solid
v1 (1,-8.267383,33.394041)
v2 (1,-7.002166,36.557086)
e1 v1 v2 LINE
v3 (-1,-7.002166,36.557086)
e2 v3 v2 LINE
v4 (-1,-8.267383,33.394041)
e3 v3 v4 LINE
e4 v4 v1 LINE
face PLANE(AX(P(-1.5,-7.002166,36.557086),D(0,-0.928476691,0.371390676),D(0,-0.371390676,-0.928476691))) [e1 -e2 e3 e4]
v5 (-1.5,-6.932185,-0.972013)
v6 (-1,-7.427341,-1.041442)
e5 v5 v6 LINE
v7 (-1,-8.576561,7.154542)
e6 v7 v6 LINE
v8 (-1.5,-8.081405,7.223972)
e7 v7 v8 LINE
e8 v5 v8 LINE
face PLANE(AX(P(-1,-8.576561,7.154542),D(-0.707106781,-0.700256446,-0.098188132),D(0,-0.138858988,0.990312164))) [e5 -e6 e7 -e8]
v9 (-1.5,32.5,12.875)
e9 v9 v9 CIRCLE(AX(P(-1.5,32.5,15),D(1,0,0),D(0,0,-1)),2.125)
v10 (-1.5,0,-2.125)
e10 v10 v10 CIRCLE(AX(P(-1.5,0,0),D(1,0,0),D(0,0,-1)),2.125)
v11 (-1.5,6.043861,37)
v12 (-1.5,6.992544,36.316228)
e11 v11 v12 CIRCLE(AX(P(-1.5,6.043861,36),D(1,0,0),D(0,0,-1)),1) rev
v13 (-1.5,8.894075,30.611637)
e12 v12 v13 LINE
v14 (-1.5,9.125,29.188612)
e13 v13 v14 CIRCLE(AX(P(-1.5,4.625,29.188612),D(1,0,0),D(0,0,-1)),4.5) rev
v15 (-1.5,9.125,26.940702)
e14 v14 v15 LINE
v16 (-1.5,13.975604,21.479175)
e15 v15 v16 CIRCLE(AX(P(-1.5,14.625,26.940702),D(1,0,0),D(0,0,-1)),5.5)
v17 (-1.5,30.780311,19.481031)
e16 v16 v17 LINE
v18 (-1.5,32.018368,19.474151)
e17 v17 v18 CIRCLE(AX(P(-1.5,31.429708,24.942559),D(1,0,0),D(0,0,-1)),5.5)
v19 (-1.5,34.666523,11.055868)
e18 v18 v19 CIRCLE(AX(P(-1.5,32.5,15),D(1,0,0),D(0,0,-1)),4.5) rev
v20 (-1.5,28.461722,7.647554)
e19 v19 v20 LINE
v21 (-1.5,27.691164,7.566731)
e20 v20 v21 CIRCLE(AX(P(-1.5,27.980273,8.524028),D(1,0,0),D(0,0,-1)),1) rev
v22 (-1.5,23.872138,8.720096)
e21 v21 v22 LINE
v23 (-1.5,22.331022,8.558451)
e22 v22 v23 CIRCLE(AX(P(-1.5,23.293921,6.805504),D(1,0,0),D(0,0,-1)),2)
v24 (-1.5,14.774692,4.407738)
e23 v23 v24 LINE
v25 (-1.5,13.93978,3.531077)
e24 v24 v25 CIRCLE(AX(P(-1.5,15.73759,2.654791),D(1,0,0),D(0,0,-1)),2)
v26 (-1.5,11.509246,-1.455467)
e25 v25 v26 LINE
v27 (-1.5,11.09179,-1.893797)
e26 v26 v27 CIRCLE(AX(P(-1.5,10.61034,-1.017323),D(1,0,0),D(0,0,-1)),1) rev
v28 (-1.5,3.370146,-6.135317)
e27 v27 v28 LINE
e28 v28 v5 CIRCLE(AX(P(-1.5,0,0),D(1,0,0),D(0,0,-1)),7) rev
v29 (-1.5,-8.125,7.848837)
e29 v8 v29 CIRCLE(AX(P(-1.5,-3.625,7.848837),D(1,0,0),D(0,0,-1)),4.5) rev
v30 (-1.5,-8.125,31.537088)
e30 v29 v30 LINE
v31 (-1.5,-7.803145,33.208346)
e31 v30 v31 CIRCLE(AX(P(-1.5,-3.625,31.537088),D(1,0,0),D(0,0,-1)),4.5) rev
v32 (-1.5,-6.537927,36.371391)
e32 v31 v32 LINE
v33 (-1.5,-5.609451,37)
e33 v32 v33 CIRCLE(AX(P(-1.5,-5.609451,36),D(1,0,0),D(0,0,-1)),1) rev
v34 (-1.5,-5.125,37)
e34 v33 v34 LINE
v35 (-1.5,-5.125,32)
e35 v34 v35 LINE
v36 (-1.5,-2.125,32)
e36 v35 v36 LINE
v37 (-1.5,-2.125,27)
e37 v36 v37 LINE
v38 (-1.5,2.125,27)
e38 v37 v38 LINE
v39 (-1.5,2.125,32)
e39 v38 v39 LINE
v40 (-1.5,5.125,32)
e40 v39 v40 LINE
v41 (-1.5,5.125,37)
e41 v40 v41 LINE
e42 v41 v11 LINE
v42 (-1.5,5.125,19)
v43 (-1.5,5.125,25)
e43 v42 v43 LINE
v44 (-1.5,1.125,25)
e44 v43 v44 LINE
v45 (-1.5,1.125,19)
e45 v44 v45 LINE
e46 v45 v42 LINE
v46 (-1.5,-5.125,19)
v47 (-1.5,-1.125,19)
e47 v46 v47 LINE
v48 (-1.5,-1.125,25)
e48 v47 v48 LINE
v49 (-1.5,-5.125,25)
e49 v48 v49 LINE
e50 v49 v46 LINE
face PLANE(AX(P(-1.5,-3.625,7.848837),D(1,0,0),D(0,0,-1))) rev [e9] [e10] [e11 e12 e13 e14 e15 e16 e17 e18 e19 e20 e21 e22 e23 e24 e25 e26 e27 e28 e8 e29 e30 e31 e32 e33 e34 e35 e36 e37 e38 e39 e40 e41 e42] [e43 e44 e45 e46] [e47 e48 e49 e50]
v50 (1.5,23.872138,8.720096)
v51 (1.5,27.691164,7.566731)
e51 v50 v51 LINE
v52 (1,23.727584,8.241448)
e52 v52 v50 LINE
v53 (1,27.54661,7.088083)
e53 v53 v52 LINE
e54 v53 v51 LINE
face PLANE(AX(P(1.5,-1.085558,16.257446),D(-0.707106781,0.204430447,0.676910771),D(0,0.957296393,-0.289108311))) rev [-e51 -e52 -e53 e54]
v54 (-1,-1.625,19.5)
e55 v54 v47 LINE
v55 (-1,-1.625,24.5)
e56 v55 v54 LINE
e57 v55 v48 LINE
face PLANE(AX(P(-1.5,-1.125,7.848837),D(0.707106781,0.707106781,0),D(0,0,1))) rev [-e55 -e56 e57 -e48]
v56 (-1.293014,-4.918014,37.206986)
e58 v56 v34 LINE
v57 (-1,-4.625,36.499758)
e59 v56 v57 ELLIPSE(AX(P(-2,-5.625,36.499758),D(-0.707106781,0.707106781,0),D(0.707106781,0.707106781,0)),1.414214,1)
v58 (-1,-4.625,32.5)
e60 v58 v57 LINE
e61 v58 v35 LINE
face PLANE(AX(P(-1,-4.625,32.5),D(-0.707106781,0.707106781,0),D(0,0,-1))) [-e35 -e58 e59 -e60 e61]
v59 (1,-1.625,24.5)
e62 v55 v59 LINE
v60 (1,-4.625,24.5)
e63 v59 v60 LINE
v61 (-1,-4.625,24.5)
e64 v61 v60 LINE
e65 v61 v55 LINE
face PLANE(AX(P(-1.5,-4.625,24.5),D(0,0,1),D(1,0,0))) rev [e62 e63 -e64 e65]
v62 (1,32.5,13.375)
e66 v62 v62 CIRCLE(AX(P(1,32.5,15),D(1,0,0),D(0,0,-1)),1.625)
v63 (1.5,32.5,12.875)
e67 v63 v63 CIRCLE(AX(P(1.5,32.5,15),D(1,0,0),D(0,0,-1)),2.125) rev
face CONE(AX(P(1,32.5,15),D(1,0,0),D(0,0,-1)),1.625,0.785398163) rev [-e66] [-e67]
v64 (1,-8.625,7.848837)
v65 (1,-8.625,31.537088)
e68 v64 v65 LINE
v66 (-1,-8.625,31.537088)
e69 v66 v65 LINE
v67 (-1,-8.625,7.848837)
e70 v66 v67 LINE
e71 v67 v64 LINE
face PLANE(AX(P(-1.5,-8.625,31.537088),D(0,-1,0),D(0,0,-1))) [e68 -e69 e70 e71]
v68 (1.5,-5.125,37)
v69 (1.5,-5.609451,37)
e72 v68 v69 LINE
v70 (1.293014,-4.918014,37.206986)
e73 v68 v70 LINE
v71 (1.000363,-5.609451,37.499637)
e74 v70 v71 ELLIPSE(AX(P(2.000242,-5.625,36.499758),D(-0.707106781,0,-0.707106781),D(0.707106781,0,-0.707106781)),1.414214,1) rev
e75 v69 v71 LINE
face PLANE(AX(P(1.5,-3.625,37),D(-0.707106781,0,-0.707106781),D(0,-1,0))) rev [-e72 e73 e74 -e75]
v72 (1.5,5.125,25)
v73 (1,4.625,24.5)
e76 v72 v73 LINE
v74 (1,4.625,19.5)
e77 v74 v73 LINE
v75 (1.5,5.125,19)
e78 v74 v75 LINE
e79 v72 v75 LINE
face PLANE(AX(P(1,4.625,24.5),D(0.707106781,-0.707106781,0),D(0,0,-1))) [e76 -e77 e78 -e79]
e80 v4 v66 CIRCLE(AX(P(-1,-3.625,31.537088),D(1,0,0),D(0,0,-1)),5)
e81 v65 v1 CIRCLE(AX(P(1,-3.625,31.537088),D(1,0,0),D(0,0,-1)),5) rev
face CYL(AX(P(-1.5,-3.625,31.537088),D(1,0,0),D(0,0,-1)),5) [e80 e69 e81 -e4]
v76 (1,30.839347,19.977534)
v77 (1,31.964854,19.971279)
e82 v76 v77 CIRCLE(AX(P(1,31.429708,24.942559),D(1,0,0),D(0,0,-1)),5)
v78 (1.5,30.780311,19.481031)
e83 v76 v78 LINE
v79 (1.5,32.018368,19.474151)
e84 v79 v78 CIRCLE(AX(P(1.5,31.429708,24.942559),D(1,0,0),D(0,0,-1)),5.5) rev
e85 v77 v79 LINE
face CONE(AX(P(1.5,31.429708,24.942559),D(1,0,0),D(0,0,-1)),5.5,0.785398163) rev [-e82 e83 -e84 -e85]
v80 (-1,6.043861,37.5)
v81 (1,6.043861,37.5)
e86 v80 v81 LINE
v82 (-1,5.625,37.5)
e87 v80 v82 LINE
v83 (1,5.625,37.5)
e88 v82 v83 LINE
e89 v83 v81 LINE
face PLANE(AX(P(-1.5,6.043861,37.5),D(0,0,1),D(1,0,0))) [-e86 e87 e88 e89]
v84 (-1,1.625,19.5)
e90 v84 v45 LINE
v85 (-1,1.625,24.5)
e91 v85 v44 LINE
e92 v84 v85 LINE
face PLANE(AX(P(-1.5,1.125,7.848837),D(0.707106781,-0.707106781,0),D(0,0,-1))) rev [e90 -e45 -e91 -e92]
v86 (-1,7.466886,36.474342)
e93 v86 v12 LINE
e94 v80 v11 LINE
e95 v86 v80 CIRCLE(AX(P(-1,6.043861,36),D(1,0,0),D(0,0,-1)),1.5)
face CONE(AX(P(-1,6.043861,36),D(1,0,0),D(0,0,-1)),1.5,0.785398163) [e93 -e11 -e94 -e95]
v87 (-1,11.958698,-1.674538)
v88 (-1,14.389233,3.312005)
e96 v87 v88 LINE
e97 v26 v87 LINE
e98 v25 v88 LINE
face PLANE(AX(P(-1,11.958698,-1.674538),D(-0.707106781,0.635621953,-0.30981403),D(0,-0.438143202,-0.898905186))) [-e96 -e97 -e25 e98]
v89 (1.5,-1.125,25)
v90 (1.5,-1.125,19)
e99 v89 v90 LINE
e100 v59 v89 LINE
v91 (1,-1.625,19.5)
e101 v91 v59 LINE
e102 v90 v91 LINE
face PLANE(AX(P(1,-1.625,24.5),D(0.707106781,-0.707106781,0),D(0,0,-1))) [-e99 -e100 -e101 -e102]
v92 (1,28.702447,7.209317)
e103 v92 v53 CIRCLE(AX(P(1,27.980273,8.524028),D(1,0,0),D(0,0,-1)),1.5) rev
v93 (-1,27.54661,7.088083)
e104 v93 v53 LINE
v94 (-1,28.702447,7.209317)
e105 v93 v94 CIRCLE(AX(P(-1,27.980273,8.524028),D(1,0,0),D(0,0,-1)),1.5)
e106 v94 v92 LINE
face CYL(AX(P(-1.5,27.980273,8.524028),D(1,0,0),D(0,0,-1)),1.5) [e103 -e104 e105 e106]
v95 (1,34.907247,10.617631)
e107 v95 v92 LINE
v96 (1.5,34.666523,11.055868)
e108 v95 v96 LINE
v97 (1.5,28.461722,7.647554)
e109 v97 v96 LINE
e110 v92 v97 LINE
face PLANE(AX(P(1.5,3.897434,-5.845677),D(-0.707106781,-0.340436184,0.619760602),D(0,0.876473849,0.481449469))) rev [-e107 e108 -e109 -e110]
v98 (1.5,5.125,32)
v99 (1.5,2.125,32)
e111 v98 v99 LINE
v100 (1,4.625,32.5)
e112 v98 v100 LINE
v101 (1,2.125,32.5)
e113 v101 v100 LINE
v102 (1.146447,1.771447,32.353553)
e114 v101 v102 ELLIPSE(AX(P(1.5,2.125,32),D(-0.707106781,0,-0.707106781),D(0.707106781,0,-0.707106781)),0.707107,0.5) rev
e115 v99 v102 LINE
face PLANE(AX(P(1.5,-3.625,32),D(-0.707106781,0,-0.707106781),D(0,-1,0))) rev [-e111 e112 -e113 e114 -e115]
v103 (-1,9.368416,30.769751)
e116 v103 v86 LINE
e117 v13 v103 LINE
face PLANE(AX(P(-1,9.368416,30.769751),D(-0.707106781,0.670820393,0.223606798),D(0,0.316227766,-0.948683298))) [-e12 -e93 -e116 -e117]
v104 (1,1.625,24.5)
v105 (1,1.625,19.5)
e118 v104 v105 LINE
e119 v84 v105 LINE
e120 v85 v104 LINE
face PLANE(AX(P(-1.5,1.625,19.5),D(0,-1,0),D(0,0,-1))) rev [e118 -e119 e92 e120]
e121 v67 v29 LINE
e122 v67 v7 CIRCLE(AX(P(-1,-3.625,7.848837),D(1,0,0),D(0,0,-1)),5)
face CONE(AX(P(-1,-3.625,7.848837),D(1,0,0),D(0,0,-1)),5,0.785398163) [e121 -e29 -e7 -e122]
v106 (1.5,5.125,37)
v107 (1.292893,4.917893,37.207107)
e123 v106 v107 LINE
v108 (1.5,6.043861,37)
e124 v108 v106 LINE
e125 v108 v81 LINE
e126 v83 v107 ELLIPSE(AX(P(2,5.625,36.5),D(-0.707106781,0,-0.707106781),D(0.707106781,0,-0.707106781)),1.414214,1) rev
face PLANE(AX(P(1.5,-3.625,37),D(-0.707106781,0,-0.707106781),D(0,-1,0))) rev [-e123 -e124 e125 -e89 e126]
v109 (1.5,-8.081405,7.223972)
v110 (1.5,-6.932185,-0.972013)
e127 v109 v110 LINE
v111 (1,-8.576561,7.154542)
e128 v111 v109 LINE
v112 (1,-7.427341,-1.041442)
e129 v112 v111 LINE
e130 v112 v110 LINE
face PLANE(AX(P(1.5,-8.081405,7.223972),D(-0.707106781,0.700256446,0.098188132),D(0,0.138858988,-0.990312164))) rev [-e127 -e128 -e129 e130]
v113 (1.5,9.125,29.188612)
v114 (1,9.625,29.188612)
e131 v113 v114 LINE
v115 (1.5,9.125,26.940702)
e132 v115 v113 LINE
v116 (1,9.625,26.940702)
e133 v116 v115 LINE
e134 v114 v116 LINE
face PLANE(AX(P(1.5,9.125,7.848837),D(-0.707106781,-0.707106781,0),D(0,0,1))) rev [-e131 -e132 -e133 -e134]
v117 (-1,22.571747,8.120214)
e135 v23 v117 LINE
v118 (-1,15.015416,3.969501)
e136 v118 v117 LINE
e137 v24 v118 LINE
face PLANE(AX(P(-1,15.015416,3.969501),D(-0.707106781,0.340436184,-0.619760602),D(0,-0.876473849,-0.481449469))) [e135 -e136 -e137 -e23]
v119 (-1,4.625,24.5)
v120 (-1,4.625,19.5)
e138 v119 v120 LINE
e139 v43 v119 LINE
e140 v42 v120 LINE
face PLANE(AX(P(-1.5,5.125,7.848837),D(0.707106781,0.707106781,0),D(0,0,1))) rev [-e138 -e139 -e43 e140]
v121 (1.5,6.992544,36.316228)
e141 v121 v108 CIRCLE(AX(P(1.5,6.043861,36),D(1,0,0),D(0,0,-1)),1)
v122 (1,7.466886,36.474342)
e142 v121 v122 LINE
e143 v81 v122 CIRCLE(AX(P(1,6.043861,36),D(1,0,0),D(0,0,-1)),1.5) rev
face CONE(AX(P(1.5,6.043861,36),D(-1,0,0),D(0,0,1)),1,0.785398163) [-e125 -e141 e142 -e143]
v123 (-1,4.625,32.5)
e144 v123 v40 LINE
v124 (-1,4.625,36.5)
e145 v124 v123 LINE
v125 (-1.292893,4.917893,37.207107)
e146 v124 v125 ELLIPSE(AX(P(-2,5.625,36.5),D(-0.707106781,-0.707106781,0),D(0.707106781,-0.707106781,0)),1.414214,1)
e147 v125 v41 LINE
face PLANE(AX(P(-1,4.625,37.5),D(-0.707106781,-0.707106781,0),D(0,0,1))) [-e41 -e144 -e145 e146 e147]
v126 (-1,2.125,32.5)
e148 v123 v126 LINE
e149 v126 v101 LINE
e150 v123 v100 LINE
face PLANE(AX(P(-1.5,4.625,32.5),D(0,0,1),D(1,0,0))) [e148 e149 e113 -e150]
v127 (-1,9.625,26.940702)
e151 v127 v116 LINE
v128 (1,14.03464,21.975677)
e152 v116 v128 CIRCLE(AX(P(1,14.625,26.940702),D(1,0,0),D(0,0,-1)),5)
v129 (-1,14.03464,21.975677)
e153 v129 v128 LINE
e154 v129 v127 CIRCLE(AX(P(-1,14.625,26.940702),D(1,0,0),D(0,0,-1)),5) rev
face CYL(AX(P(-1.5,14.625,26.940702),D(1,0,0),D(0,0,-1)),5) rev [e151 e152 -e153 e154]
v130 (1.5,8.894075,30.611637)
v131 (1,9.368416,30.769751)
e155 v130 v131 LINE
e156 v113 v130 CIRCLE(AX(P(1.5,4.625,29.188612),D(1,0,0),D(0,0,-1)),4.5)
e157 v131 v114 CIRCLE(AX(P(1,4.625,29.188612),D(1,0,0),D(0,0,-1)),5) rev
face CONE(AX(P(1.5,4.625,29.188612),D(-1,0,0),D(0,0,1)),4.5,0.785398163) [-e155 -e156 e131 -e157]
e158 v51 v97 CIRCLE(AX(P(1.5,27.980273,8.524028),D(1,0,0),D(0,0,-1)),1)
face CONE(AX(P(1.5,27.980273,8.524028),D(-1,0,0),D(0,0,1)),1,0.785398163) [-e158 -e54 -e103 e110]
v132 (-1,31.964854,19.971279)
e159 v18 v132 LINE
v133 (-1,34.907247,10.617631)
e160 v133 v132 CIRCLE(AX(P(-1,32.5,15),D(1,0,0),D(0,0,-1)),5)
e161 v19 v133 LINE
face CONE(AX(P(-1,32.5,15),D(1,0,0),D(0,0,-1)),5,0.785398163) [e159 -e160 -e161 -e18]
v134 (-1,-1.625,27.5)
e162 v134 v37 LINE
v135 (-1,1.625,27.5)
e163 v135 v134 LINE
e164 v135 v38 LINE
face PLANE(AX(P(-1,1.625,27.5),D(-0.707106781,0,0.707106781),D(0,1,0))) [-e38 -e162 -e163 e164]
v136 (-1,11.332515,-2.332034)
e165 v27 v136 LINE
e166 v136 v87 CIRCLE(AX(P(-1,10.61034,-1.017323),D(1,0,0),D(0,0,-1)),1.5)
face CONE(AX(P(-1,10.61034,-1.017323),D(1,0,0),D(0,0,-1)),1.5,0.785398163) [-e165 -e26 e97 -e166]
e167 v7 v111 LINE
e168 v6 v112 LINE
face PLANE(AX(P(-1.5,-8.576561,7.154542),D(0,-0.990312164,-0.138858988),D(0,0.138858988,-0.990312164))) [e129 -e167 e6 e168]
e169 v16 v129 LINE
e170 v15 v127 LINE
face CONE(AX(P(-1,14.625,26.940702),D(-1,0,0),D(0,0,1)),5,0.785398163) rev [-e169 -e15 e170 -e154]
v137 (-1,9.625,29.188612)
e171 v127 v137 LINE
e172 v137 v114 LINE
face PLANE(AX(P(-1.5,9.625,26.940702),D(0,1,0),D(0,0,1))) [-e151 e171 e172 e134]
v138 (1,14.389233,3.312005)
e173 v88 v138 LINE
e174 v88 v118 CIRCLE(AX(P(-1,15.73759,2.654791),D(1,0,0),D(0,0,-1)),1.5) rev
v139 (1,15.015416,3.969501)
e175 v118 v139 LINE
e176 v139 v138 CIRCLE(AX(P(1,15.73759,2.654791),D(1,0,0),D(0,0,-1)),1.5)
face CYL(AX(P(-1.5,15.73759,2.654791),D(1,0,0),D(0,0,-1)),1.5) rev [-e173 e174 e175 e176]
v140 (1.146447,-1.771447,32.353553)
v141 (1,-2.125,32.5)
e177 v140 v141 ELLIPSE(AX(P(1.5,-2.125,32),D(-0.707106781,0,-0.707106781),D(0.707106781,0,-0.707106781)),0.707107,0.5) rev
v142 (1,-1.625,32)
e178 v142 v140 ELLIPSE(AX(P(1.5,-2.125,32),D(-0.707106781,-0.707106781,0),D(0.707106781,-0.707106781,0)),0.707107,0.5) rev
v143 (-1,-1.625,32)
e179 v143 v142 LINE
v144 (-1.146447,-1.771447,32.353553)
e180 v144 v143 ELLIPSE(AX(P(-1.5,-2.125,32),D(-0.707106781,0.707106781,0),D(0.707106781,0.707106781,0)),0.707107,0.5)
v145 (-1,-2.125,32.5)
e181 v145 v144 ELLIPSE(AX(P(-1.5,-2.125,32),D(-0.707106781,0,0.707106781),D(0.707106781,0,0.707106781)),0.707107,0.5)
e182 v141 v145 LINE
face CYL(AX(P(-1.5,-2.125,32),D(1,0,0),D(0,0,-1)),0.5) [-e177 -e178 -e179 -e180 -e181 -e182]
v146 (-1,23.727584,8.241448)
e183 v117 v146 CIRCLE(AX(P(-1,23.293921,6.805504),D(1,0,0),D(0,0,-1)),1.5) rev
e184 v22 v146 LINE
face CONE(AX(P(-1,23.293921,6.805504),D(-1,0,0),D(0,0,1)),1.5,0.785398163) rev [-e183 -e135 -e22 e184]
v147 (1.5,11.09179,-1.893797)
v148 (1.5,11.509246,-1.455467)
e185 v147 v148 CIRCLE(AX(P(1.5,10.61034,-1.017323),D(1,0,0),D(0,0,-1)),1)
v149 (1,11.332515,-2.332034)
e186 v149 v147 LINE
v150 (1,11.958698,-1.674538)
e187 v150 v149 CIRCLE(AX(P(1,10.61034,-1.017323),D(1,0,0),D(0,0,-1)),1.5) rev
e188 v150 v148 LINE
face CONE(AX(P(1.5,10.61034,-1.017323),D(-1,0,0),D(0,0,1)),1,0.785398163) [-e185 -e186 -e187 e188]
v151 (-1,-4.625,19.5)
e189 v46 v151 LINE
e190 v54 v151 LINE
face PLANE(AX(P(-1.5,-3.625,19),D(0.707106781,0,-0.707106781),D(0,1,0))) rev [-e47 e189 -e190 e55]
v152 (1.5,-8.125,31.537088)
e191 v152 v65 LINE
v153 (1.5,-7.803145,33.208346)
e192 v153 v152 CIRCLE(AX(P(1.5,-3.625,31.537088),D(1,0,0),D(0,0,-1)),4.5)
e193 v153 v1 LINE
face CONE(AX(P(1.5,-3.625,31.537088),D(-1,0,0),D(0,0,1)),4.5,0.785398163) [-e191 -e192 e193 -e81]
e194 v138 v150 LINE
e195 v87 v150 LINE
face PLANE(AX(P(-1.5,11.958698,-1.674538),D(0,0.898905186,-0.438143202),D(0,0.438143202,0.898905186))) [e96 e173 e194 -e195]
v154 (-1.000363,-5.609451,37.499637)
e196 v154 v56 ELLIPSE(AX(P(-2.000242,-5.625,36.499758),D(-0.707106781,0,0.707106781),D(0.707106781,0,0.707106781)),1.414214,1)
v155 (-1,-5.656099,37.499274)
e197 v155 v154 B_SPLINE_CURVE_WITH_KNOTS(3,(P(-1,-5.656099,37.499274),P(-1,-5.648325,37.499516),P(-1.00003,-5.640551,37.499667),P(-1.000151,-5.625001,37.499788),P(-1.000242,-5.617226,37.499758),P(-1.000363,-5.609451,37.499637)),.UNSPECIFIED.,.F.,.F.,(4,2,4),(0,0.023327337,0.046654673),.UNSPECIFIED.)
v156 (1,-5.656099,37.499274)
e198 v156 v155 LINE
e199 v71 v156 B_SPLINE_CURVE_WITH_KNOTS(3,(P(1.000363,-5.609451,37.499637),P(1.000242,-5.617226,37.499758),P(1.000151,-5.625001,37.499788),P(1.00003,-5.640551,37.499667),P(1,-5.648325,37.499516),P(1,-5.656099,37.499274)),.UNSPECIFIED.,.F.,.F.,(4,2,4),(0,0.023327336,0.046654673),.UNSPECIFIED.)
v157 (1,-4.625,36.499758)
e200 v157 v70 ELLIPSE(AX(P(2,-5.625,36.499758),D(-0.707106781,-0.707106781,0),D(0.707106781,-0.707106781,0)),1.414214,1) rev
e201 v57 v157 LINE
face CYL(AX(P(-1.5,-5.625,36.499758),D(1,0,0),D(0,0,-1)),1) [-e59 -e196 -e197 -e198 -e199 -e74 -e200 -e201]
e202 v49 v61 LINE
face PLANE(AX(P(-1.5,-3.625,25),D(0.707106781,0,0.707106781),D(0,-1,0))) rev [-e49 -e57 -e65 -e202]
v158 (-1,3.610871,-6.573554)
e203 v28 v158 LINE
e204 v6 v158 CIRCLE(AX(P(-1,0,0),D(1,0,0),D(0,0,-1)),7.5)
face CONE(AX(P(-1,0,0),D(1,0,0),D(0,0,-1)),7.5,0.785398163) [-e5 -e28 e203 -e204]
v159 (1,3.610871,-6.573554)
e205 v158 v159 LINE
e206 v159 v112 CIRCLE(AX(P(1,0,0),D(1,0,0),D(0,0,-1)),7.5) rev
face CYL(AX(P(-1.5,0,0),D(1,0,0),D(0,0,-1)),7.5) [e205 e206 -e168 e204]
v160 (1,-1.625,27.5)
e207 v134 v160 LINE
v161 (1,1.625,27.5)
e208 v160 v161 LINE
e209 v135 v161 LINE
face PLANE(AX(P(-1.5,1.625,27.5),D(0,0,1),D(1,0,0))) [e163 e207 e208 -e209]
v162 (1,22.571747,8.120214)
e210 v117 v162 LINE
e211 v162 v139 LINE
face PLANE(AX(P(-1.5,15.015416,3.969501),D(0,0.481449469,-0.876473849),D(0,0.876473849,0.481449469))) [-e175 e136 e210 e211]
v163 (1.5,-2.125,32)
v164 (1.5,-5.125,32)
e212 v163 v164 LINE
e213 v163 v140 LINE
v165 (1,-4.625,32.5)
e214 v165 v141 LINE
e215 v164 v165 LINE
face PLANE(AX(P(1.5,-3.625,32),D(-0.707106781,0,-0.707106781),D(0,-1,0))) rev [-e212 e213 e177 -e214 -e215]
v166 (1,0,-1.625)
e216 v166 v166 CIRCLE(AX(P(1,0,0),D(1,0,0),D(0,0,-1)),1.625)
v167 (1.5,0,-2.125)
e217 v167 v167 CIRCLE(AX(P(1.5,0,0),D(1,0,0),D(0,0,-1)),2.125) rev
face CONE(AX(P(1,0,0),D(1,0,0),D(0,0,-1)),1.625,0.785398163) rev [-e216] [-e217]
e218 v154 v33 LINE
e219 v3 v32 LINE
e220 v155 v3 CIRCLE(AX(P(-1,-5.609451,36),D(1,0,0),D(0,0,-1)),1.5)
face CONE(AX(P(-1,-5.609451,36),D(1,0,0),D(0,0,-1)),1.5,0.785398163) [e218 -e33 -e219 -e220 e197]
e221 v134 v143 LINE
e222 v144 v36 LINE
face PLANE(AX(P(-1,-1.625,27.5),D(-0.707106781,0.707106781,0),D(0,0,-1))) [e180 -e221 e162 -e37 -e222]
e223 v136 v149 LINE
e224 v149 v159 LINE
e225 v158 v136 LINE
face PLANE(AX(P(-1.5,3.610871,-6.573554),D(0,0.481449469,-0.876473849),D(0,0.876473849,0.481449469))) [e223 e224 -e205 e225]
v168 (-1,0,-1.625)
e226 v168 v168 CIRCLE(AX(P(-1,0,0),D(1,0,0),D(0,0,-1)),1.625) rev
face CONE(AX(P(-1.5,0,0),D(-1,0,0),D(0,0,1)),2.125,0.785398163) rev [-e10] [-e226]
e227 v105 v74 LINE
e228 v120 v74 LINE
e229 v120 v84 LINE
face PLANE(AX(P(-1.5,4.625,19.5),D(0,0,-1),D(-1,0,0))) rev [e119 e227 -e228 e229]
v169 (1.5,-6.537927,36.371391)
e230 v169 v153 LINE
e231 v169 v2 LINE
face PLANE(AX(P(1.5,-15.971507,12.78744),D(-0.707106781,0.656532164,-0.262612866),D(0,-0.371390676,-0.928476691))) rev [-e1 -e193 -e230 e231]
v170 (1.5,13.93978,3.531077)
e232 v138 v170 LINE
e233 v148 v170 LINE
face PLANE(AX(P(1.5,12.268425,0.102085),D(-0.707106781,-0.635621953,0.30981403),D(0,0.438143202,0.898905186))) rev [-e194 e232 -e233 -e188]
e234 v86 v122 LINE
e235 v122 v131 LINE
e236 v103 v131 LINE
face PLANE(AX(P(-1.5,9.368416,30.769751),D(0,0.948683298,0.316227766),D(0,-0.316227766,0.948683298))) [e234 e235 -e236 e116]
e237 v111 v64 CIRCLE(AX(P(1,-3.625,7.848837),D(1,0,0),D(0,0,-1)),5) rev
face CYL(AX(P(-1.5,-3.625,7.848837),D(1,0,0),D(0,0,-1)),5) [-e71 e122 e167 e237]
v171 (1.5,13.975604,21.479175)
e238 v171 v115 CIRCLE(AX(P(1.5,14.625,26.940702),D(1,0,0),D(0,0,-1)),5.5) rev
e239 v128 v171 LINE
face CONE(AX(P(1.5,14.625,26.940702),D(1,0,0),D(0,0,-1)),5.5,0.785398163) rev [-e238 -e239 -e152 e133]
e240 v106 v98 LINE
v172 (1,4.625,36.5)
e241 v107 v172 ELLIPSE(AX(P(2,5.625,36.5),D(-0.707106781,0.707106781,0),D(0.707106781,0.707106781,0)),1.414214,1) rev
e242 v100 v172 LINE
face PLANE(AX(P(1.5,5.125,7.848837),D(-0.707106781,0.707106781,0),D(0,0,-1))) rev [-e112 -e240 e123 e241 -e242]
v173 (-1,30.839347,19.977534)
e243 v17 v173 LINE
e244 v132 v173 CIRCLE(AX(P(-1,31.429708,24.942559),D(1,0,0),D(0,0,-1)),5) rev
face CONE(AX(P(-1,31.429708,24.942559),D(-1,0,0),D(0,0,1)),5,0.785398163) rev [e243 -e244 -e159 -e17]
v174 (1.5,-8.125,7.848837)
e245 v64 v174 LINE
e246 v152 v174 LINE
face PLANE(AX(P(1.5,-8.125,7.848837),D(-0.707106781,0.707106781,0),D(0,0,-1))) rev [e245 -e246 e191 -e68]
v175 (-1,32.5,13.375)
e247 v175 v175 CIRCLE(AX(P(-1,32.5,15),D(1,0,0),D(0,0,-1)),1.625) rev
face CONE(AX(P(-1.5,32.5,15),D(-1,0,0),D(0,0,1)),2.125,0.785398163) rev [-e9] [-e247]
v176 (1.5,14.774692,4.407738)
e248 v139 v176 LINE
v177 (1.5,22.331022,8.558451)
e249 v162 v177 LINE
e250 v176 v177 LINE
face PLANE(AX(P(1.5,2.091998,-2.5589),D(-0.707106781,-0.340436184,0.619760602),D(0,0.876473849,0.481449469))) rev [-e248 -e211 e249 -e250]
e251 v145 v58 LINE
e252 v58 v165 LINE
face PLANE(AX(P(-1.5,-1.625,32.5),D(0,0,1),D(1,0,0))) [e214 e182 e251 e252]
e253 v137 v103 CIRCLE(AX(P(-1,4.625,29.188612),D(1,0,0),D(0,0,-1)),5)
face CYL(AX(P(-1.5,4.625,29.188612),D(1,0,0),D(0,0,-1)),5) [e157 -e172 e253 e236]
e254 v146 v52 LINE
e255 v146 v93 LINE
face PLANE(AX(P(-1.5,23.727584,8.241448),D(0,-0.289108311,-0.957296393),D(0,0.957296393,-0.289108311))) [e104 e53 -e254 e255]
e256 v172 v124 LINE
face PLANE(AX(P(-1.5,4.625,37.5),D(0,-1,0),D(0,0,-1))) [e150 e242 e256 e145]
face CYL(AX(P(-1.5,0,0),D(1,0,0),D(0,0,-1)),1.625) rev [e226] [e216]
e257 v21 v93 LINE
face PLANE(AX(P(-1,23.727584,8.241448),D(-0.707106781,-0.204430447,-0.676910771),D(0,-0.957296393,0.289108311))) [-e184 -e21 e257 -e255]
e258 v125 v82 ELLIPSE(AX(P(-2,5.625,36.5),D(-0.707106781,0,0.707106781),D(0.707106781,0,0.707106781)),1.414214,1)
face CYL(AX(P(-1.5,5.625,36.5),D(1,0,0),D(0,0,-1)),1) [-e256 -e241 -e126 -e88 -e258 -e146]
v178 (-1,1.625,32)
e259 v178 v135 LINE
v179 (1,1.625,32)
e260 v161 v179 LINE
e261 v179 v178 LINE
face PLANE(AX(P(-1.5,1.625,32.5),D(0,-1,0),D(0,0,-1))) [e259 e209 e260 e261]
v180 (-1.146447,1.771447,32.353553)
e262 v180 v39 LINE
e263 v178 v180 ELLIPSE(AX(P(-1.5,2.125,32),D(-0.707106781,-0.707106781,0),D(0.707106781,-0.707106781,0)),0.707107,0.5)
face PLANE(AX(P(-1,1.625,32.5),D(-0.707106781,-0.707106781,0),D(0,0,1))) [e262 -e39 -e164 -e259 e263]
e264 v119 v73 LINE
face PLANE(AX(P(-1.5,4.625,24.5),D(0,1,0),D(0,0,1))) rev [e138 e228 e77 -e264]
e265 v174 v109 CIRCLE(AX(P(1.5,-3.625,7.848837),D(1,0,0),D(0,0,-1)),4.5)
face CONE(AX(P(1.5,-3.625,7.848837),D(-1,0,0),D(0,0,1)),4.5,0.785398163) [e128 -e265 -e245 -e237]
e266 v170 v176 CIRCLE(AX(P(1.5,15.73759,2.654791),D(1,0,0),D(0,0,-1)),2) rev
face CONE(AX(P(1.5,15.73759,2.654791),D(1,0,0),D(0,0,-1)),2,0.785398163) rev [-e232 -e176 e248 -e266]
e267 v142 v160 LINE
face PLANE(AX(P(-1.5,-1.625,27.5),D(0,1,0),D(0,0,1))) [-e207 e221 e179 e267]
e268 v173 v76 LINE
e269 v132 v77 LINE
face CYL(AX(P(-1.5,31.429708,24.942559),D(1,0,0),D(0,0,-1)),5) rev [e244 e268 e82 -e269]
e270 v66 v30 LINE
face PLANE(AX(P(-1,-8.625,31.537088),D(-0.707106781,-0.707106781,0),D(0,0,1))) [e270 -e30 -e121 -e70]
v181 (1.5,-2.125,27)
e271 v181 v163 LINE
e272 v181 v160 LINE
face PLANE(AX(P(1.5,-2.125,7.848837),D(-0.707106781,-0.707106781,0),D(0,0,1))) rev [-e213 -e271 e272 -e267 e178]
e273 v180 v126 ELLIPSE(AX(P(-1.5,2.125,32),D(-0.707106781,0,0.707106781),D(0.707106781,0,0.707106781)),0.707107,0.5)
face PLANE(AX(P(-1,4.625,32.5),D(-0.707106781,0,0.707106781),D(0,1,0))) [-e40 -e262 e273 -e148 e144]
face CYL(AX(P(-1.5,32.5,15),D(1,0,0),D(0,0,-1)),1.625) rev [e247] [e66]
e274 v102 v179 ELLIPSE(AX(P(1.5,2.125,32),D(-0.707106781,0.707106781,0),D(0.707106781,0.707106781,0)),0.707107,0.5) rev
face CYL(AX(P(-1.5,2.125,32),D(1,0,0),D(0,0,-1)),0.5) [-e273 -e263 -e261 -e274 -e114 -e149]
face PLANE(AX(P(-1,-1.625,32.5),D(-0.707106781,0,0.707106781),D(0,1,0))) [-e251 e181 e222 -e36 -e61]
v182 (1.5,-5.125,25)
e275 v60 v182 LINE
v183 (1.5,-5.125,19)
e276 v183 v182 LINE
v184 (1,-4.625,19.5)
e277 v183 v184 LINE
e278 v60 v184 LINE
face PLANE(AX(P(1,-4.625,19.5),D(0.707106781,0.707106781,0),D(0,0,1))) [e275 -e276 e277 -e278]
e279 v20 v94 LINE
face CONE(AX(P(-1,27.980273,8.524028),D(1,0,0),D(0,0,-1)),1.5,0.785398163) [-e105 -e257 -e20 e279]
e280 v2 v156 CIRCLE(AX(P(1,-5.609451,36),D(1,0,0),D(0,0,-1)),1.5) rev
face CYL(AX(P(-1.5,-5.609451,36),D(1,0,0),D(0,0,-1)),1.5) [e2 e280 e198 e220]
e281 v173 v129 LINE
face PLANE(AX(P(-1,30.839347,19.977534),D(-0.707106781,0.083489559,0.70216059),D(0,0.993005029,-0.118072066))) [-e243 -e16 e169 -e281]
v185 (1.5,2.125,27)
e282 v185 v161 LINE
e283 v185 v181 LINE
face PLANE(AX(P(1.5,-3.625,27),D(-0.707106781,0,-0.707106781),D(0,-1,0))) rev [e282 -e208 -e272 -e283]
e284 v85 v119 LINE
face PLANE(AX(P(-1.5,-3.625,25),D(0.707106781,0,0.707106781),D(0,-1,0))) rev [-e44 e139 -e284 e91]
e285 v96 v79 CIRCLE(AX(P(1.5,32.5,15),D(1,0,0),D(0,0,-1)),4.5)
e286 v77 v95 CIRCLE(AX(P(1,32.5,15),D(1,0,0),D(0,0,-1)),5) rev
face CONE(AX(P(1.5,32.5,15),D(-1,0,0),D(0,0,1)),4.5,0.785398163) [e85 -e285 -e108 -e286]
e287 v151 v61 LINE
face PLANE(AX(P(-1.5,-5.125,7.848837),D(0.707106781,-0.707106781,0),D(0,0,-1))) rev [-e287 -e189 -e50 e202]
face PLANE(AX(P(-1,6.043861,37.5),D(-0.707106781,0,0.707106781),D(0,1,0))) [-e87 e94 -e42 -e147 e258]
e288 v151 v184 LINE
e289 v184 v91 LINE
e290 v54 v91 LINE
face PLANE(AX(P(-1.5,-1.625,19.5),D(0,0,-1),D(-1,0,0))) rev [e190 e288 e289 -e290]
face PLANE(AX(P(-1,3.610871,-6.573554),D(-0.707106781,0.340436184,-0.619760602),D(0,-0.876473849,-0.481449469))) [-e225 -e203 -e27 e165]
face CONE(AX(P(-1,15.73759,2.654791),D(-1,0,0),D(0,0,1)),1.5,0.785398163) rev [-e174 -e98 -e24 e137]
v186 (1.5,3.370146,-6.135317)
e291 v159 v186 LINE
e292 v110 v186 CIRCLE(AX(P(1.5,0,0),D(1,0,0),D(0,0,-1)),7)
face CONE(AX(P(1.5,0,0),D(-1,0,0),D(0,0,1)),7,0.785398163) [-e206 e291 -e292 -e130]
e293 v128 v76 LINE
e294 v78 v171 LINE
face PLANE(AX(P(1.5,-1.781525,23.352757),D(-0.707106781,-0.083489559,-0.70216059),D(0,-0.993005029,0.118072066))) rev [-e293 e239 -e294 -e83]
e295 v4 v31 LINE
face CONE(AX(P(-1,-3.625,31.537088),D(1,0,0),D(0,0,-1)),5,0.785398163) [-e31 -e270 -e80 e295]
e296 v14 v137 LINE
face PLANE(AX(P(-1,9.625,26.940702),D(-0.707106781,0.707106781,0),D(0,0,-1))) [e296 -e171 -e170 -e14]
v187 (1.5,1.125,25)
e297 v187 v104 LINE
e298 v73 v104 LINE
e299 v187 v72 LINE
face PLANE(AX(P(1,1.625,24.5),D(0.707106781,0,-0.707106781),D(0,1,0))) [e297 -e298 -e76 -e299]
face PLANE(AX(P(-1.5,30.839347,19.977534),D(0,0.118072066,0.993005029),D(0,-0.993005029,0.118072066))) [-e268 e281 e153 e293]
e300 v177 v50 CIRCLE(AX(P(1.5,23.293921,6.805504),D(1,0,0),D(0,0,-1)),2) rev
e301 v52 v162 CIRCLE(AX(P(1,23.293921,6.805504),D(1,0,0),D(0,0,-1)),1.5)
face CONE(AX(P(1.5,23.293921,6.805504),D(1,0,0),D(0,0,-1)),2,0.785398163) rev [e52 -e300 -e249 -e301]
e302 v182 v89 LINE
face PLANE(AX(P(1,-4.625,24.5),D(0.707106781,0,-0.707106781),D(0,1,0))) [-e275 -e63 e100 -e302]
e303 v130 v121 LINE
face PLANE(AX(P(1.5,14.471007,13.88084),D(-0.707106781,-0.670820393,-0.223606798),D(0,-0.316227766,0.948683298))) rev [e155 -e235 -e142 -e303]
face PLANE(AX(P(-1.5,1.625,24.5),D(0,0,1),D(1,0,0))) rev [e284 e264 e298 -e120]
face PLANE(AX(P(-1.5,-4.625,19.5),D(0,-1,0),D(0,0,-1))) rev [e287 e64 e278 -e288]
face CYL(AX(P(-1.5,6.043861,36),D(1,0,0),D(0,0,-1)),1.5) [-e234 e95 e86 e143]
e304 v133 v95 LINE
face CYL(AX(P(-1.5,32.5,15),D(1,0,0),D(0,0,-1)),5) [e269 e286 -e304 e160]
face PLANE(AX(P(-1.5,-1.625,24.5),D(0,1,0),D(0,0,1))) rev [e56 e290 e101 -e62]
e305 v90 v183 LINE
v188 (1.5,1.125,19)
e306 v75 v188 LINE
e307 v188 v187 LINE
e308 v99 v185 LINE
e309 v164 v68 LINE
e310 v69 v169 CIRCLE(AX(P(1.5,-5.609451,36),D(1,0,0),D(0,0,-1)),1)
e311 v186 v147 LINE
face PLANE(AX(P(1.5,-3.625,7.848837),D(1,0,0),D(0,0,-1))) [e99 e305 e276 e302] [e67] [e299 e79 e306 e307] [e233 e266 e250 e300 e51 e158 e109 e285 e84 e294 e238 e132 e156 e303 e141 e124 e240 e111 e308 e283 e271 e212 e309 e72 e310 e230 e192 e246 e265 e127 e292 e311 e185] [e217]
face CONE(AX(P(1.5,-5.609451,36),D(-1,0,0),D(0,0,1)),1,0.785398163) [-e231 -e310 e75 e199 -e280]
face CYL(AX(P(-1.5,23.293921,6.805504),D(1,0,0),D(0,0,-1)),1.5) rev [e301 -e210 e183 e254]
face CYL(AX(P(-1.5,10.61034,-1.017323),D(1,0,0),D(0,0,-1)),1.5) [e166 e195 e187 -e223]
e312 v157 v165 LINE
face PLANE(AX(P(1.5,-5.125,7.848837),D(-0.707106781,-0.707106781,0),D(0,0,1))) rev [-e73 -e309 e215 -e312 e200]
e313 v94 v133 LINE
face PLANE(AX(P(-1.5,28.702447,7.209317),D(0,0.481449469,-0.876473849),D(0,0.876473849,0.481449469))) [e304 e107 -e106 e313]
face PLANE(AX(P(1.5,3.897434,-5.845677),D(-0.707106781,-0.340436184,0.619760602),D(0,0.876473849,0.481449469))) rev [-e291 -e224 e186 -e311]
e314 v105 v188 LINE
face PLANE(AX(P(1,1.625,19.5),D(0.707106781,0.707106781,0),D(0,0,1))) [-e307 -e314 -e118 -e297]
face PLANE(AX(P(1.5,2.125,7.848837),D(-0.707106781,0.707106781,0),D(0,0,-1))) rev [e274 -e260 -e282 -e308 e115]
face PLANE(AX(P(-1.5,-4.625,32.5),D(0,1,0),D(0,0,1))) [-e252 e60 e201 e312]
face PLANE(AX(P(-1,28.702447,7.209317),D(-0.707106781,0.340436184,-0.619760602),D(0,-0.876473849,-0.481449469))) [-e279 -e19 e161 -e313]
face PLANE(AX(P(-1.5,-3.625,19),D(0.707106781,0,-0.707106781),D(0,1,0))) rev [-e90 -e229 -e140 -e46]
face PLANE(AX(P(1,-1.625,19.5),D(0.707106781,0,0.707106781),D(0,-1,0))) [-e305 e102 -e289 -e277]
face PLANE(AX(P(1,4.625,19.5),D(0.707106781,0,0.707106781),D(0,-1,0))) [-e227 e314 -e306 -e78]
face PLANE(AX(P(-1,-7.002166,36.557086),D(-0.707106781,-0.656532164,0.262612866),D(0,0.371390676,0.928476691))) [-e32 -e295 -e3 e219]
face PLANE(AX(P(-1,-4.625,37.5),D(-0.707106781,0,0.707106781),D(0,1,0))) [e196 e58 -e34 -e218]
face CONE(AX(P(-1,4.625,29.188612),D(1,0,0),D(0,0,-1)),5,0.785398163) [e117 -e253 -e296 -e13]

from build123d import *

# Parameters (mm, degrees)
SKETCH_1_R      = 1.625
SKETCH_1_W      = 5
SKETCH_1_H      = 3
EXTRUDE_1_DEPTH = 3
CHAMFER_1_SIZE  = 0.5
FILLET_1_R      = 1
FILLET_2_R      = 0.5
EXTRUDE_2_DEPTH = 3


with BuildPart() as part:
    # 草图1 → 凸台-拉伸1 (new body)
    with BuildSketch(Plane(origin=(1.5, 0, 0), x_dir=(0, 0, -1), z_dir=(1, 0, 0))):
        with BuildLine():
            Line((-7.154542269, -8.576560818), (1.041442411, -7.427341227))
            ThreePointArc((1.041442411, -7.427341227), (6.705040976, -3.360420437), (6.573553871, 3.610871017))
            Line((6.573553871, 3.610871017), (2.332034096, 11.332514521))
            ThreePointArc((2.332034096, 11.332514521), (2.051803428, 11.696549741), (1.674538126, 11.958698097))
            Line((1.674538126, 11.958698097), (-3.312005463, 14.389232718))
            ThreePointArc((-3.312005463, 14.389232718), (-3.689270765, 14.651381075), (-3.969501433, 15.015416295))
            Line((-3.969501433, 15.015416295), (-8.120214479, 22.571747074))
            ThreePointArc((-8.120214479, 22.571747074), (-8.297319992, 23.137447109), (-8.241448295, 23.727583743))
            Line((-8.241448295, 23.727583743), (-7.088083158, 27.546610192))
            ThreePointArc((-7.088083158, 27.546610192), (-7.032211461, 28.136746826), (-7.209316974, 28.702446861))
            Line((-7.209316974, 28.702446861), (-10.617630753, 34.907247345))
            ThreePointArc((-10.617630753, 34.907247345), (-16.500374515, 37.269578211), (-19.97127937, 31.964853827))
            ThreePointArc((-19.97127937, 31.964853827), (-19.942635933, 31.401924032), (-19.977533596, 30.839347323))
            Line((-19.977533596, 30.839347323), (-21.975677109, 14.034639668))
            ThreePointArc((-21.975677109, 14.034639668), (-23.620446364, 10.886564387), (-26.940702253, 9.625))
            Line((-26.940702253, 9.625), (-29.188611699, 9.625))
            ThreePointArc((-29.188611699, 9.625), (-29.989522914, 9.560437288), (-30.769750529, 9.36841649))
            Line((-30.769750529, 9.36841649), (-36.474341649, 7.466886117))
            ThreePointArc((-36.474341649, 7.466886117), (-37.216863278, 6.920926597), (-37.5, 6.04386117))
            Line((-37.5, 6.04386117), (-37.5, 4.625))
            Line((-37.5, 4.625), (-32.5, 4.625))
            Line((-32.5, 4.625), (-32.5, 1.625))
            Line((-32.5, 1.625), (-27.5, 1.625))
            Line((-27.5, 1.625), (-27.5, -1.625))
            Line((-27.5, -1.625), (-32.5, -1.625))
            Line((-32.5, -1.625), (-32.5, -4.625))
            Line((-32.5, -4.625), (-37.5, -4.625))
            Line((-37.5, -4.625), (-37.5, -5.609450558))
            ThreePointArc((-37.5, -5.609450558), (-37.242100846, -6.450393772), (-36.557086015, -7.002165594))
            Line((-36.557086015, -7.002165594), (-33.394041364, -8.267383454))
            ThreePointArc((-33.394041364, -8.267383454), (-32.482625588, -8.534781934), (-31.537087982, -8.625))
            Line((-31.537087982, -8.625), (-7.848837209, -8.625))
            ThreePointArc((-7.848837209, -8.625), (-7.500845895, -8.612875504), (-7.154542269, -8.576560818))
        make_face()
        with Locations(Location((-15, 32.5, 0), (0, 0, 180))):
            Circle(SKETCH_1_R, mode=Mode.SUBTRACT)
        with Locations(Location((0, 0, 0), (0, 0, 180))):
            Circle(SKETCH_1_R, mode=Mode.SUBTRACT)
        with Locations((-22, 3.125)):
            Rectangle(SKETCH_1_W, SKETCH_1_H, mode=Mode.SUBTRACT)
        with Locations((-22, -3.125)):
            Rectangle(SKETCH_1_W, SKETCH_1_H, mode=Mode.SUBTRACT)
        with BuildLine():
            Line((-9.961966793, 5.476712688), (-17.295484898, 21.366001917))
            ThreePointArc((-17.295484898, 21.366001917), (-16.439907786, 23.68828265), (-14.117627052, 22.832705538))
            Line((-14.117627052, 22.832705538), (-6.784108947, 6.943416309))
            ThreePointArc((-6.784108947, 6.943416309), (-7.639686059, 4.621135575), (-9.961966793, 5.476712688))
        make_face(mode=Mode.SUBTRACT)
    extrude(amount=-EXTRUDE_1_DEPTH)

    # 倒角1
    chamfer_1_edges = [part.edges().sort_by_distance(p)[0] for p in [
        (-1.5, 0, 27.5),
        (-1.5, -3.125, 24.5),
        (-1.5, -1.625, 22),
        (-1.5, -3.125, 19.5),
        (-1.5, -4.625, 22),
        (1.5, -3.125, 24.5),
        (1.5, -4.625, 22),
        (1.5, -3.125, 19.5),
        (-1.5, -1.625, 30),
        (1.5, -1.625, 22),
        (-1.5, -3.125, 32.5),
        (-1.5, -4.625, 35),
        (-1.5, 4.621135575, 7.639686059),
        (-1.5, 13.421357302, 13.628725845),
        (-1.5, 23.68828265, 16.439907786),
        (-1.5, 14.888060923, 10.450868),
        (-1.5, -5.117225279, 37.5),
        (1.5, 4.621135575, 7.639686059),
        (1.5, 14.888060923, 10.450868),
        (1.5, 23.68828265, 16.439907786),
        (1.5, 13.421357302, 13.628725845),
        (-1.5, -6.450393772, 37.242100846),
        (-1.5, -7.634774524, 34.975563689),
        (-1.5, -8.534781934, 32.482625588),
        (-1.5, -3.360420437, -6.705040976),
        (-1.5, -8.625, 19.692962596),
        (-1.5, 7.471692769, -4.452793984),
        (-1.5, 11.696549741, -2.051803428),
        (-1.5, 13.173965408, 0.818733668),
        (-1.5, 14.651381075, 3.689270765),
        (1.5, -8.625, 19.692962596),
        (1.5, -8.534781934, 32.482625588),
        (1.5, -7.634774524, 34.975563689),
        (1.5, -6.450393772, 37.242100846),
        (1.5, -5.117225279, 37.5),
        (-1.5, 18.793581684, 6.044857956),
        (1.5, -4.625, 35),
        (1.5, -3.125, 32.5),
        (1.5, -1.625, 30),
        (1.5, 0, 27.5),
        (1.5, 1.625, 30),
        (1.5, 3.125, 32.5),
        (1.5, 4.625, 35),
        (1.5, 5.334430585, 37.5),
        (1.5, 6.920926597, 37.216863278),
        (1.5, 8.417651304, 33.622046089),
        (-1.5, 23.137447109, 8.297319992),
        (1.5, 9.560437288, 29.989522914),
        (1.5, 9.625, 28.064656976),
        (1.5, 10.886564387, 23.620446364),
        (1.5, 22.436993496, 20.976605353),
        (1.5, 31.401924032, 19.942635933),
        (1.5, 37.269578211, 16.500374515),
        (1.5, 31.804847103, 8.913473863),
        (1.5, 28.136746826, 7.032211461),
        (1.5, 25.637096968, 7.664765726),
        (1.5, 23.137447109, 8.297319992),
        (-1.5, 25.637096968, 7.664765726),
        (1.5, 18.793581684, 6.044857956),
        (1.5, 14.651381075, 3.689270765),
        (1.5, 13.173965408, 0.818733668),
        (1.5, 11.696549741, -2.051803428),
        (1.5, 7.471692769, -4.452793984),
        (1.5, -3.360420437, -6.705040976),
        (1.5, -8.001951023, 3.056549929),
        (1.5, -8.612875504, 7.500845895),
        (-1.5, 28.136746826, 7.032211461),
        (-1.5, 31.804847103, 8.913473863),
        (-1.5, -8.612875504, 7.500845895),
        (-1.5, 37.269578211, 16.500374515),
        (-1.5, 31.401924032, 19.942635933),
        (-1.5, 22.436993496, 20.976605353),
        (-1.5, 10.886564387, 23.620446364),
        (-1.5, 9.625, 28.064656976),
        (-1.5, 9.560437288, 29.989522914),
        (-1.5, 8.417651304, 33.622046089),
        (-1.5, 32.5, 13.375),
        (1.5, 32.5, 13.375),
        (-1.5, 6.920926597, 37.216863278),
        (-1.5, 0, -1.625),
        (1.5, 0, -1.625),
        (-1.5, 5.334430585, 37.5),
        (-1.5, 4.625, 35),
        (-1.5, 3.125, 19.5),
        (-1.5, -8.001951023, 3.056549929),
        (-1.5, 1.625, 22),
        (-1.5, 3.125, 24.5),
        (-1.5, 4.625, 22),
        (1.5, 3.125, 19.5),
        (1.5, 4.625, 22),
        (1.5, 3.125, 24.5),
        (1.5, 1.625, 22),
        (-1.5, 3.125, 32.5),
        (-1.5, 1.625, 30),
    ]]
    chamfer(chamfer_1_edges, length=CHAMFER_1_SIZE)

    # 圆角1
    # the kernel refuses this fillet: 1 mm, written as the material it takes off along each edge
    with BuildSketch(Plane(origin=(3.577747849, -4.625, 37.5), x_dir=(0, -0.9999997524396673, -0.000703648068189184), z_dir=(-1, 0, 0))) as fillet_1_piece_1:
        with BuildLine():
            CenterArc((1.000703571, -0.999537948), FILLET_1_R, 88.258193912, 91.782122156)
            Line((0.000703818, -1.000241596), (-0.099296157, -1.000311961))
            Line((-0.099296157, -1.000311961), (-0.099999975, -7.0365e-05))
            Line((-0.099999975, -7.0365e-05), (-7.0365e-05, 0.099999975))
            ThreePointArc((-7.0365e-05, 0.099999975), (0.984379949, 0.100692682), (1.034138696, 0.099953795))
            Line((1.034138696, 0.099953795), (1.03109914, 0))
        make_face()
    extrude(amount=7.155495698, mode=Mode.SUBTRACT)
    with BuildSketch(Plane(origin=(3.5, 4.625, 37.5), x_dir=(0, 0, -1), z_dir=(-1, 0, 0))) as fillet_1_piece_2:
        with BuildLine():
            CenterArc((FILLET_1_R, -FILLET_1_R), FILLET_1_R, 90, 90)
            Line((0, -FILLET_1_R), (0, 0))
            Line((0, 0), (FILLET_1_R, 0))
        make_face()
    extrude(amount=7, mode=Mode.SUBTRACT)

    # 圆角2
    fillet_2_edges = [part.edges().sort_by_distance(p)[0] for p in [
        (0, 1.625, 32.5),
        (0, -1.625, 32.5),
    ]]
    fillet(fillet_2_edges, radius=FILLET_2_R)

    # Sketch 3D_1 → 凸台-拉伸2 (add)
    with BuildSketch(Plane(origin=(1.5, 22.89191641, 19.156270075), x_dir=(0, -0.8525521578237779, -0.5226421511799639), z_dir=(1, 0, 0))):
        Polygon((0, 0), (16.191873752, -5.770917197), (27.468575768, 0), (19.557121084, 8.11942404), (6.27778787, 5.658813531), (-1.099641064, 7.65553458), (-1.226258679, 2.829349925), align=None)
    extrude(amount=-EXTRUDE_2_DEPTH)


solid = part.part
